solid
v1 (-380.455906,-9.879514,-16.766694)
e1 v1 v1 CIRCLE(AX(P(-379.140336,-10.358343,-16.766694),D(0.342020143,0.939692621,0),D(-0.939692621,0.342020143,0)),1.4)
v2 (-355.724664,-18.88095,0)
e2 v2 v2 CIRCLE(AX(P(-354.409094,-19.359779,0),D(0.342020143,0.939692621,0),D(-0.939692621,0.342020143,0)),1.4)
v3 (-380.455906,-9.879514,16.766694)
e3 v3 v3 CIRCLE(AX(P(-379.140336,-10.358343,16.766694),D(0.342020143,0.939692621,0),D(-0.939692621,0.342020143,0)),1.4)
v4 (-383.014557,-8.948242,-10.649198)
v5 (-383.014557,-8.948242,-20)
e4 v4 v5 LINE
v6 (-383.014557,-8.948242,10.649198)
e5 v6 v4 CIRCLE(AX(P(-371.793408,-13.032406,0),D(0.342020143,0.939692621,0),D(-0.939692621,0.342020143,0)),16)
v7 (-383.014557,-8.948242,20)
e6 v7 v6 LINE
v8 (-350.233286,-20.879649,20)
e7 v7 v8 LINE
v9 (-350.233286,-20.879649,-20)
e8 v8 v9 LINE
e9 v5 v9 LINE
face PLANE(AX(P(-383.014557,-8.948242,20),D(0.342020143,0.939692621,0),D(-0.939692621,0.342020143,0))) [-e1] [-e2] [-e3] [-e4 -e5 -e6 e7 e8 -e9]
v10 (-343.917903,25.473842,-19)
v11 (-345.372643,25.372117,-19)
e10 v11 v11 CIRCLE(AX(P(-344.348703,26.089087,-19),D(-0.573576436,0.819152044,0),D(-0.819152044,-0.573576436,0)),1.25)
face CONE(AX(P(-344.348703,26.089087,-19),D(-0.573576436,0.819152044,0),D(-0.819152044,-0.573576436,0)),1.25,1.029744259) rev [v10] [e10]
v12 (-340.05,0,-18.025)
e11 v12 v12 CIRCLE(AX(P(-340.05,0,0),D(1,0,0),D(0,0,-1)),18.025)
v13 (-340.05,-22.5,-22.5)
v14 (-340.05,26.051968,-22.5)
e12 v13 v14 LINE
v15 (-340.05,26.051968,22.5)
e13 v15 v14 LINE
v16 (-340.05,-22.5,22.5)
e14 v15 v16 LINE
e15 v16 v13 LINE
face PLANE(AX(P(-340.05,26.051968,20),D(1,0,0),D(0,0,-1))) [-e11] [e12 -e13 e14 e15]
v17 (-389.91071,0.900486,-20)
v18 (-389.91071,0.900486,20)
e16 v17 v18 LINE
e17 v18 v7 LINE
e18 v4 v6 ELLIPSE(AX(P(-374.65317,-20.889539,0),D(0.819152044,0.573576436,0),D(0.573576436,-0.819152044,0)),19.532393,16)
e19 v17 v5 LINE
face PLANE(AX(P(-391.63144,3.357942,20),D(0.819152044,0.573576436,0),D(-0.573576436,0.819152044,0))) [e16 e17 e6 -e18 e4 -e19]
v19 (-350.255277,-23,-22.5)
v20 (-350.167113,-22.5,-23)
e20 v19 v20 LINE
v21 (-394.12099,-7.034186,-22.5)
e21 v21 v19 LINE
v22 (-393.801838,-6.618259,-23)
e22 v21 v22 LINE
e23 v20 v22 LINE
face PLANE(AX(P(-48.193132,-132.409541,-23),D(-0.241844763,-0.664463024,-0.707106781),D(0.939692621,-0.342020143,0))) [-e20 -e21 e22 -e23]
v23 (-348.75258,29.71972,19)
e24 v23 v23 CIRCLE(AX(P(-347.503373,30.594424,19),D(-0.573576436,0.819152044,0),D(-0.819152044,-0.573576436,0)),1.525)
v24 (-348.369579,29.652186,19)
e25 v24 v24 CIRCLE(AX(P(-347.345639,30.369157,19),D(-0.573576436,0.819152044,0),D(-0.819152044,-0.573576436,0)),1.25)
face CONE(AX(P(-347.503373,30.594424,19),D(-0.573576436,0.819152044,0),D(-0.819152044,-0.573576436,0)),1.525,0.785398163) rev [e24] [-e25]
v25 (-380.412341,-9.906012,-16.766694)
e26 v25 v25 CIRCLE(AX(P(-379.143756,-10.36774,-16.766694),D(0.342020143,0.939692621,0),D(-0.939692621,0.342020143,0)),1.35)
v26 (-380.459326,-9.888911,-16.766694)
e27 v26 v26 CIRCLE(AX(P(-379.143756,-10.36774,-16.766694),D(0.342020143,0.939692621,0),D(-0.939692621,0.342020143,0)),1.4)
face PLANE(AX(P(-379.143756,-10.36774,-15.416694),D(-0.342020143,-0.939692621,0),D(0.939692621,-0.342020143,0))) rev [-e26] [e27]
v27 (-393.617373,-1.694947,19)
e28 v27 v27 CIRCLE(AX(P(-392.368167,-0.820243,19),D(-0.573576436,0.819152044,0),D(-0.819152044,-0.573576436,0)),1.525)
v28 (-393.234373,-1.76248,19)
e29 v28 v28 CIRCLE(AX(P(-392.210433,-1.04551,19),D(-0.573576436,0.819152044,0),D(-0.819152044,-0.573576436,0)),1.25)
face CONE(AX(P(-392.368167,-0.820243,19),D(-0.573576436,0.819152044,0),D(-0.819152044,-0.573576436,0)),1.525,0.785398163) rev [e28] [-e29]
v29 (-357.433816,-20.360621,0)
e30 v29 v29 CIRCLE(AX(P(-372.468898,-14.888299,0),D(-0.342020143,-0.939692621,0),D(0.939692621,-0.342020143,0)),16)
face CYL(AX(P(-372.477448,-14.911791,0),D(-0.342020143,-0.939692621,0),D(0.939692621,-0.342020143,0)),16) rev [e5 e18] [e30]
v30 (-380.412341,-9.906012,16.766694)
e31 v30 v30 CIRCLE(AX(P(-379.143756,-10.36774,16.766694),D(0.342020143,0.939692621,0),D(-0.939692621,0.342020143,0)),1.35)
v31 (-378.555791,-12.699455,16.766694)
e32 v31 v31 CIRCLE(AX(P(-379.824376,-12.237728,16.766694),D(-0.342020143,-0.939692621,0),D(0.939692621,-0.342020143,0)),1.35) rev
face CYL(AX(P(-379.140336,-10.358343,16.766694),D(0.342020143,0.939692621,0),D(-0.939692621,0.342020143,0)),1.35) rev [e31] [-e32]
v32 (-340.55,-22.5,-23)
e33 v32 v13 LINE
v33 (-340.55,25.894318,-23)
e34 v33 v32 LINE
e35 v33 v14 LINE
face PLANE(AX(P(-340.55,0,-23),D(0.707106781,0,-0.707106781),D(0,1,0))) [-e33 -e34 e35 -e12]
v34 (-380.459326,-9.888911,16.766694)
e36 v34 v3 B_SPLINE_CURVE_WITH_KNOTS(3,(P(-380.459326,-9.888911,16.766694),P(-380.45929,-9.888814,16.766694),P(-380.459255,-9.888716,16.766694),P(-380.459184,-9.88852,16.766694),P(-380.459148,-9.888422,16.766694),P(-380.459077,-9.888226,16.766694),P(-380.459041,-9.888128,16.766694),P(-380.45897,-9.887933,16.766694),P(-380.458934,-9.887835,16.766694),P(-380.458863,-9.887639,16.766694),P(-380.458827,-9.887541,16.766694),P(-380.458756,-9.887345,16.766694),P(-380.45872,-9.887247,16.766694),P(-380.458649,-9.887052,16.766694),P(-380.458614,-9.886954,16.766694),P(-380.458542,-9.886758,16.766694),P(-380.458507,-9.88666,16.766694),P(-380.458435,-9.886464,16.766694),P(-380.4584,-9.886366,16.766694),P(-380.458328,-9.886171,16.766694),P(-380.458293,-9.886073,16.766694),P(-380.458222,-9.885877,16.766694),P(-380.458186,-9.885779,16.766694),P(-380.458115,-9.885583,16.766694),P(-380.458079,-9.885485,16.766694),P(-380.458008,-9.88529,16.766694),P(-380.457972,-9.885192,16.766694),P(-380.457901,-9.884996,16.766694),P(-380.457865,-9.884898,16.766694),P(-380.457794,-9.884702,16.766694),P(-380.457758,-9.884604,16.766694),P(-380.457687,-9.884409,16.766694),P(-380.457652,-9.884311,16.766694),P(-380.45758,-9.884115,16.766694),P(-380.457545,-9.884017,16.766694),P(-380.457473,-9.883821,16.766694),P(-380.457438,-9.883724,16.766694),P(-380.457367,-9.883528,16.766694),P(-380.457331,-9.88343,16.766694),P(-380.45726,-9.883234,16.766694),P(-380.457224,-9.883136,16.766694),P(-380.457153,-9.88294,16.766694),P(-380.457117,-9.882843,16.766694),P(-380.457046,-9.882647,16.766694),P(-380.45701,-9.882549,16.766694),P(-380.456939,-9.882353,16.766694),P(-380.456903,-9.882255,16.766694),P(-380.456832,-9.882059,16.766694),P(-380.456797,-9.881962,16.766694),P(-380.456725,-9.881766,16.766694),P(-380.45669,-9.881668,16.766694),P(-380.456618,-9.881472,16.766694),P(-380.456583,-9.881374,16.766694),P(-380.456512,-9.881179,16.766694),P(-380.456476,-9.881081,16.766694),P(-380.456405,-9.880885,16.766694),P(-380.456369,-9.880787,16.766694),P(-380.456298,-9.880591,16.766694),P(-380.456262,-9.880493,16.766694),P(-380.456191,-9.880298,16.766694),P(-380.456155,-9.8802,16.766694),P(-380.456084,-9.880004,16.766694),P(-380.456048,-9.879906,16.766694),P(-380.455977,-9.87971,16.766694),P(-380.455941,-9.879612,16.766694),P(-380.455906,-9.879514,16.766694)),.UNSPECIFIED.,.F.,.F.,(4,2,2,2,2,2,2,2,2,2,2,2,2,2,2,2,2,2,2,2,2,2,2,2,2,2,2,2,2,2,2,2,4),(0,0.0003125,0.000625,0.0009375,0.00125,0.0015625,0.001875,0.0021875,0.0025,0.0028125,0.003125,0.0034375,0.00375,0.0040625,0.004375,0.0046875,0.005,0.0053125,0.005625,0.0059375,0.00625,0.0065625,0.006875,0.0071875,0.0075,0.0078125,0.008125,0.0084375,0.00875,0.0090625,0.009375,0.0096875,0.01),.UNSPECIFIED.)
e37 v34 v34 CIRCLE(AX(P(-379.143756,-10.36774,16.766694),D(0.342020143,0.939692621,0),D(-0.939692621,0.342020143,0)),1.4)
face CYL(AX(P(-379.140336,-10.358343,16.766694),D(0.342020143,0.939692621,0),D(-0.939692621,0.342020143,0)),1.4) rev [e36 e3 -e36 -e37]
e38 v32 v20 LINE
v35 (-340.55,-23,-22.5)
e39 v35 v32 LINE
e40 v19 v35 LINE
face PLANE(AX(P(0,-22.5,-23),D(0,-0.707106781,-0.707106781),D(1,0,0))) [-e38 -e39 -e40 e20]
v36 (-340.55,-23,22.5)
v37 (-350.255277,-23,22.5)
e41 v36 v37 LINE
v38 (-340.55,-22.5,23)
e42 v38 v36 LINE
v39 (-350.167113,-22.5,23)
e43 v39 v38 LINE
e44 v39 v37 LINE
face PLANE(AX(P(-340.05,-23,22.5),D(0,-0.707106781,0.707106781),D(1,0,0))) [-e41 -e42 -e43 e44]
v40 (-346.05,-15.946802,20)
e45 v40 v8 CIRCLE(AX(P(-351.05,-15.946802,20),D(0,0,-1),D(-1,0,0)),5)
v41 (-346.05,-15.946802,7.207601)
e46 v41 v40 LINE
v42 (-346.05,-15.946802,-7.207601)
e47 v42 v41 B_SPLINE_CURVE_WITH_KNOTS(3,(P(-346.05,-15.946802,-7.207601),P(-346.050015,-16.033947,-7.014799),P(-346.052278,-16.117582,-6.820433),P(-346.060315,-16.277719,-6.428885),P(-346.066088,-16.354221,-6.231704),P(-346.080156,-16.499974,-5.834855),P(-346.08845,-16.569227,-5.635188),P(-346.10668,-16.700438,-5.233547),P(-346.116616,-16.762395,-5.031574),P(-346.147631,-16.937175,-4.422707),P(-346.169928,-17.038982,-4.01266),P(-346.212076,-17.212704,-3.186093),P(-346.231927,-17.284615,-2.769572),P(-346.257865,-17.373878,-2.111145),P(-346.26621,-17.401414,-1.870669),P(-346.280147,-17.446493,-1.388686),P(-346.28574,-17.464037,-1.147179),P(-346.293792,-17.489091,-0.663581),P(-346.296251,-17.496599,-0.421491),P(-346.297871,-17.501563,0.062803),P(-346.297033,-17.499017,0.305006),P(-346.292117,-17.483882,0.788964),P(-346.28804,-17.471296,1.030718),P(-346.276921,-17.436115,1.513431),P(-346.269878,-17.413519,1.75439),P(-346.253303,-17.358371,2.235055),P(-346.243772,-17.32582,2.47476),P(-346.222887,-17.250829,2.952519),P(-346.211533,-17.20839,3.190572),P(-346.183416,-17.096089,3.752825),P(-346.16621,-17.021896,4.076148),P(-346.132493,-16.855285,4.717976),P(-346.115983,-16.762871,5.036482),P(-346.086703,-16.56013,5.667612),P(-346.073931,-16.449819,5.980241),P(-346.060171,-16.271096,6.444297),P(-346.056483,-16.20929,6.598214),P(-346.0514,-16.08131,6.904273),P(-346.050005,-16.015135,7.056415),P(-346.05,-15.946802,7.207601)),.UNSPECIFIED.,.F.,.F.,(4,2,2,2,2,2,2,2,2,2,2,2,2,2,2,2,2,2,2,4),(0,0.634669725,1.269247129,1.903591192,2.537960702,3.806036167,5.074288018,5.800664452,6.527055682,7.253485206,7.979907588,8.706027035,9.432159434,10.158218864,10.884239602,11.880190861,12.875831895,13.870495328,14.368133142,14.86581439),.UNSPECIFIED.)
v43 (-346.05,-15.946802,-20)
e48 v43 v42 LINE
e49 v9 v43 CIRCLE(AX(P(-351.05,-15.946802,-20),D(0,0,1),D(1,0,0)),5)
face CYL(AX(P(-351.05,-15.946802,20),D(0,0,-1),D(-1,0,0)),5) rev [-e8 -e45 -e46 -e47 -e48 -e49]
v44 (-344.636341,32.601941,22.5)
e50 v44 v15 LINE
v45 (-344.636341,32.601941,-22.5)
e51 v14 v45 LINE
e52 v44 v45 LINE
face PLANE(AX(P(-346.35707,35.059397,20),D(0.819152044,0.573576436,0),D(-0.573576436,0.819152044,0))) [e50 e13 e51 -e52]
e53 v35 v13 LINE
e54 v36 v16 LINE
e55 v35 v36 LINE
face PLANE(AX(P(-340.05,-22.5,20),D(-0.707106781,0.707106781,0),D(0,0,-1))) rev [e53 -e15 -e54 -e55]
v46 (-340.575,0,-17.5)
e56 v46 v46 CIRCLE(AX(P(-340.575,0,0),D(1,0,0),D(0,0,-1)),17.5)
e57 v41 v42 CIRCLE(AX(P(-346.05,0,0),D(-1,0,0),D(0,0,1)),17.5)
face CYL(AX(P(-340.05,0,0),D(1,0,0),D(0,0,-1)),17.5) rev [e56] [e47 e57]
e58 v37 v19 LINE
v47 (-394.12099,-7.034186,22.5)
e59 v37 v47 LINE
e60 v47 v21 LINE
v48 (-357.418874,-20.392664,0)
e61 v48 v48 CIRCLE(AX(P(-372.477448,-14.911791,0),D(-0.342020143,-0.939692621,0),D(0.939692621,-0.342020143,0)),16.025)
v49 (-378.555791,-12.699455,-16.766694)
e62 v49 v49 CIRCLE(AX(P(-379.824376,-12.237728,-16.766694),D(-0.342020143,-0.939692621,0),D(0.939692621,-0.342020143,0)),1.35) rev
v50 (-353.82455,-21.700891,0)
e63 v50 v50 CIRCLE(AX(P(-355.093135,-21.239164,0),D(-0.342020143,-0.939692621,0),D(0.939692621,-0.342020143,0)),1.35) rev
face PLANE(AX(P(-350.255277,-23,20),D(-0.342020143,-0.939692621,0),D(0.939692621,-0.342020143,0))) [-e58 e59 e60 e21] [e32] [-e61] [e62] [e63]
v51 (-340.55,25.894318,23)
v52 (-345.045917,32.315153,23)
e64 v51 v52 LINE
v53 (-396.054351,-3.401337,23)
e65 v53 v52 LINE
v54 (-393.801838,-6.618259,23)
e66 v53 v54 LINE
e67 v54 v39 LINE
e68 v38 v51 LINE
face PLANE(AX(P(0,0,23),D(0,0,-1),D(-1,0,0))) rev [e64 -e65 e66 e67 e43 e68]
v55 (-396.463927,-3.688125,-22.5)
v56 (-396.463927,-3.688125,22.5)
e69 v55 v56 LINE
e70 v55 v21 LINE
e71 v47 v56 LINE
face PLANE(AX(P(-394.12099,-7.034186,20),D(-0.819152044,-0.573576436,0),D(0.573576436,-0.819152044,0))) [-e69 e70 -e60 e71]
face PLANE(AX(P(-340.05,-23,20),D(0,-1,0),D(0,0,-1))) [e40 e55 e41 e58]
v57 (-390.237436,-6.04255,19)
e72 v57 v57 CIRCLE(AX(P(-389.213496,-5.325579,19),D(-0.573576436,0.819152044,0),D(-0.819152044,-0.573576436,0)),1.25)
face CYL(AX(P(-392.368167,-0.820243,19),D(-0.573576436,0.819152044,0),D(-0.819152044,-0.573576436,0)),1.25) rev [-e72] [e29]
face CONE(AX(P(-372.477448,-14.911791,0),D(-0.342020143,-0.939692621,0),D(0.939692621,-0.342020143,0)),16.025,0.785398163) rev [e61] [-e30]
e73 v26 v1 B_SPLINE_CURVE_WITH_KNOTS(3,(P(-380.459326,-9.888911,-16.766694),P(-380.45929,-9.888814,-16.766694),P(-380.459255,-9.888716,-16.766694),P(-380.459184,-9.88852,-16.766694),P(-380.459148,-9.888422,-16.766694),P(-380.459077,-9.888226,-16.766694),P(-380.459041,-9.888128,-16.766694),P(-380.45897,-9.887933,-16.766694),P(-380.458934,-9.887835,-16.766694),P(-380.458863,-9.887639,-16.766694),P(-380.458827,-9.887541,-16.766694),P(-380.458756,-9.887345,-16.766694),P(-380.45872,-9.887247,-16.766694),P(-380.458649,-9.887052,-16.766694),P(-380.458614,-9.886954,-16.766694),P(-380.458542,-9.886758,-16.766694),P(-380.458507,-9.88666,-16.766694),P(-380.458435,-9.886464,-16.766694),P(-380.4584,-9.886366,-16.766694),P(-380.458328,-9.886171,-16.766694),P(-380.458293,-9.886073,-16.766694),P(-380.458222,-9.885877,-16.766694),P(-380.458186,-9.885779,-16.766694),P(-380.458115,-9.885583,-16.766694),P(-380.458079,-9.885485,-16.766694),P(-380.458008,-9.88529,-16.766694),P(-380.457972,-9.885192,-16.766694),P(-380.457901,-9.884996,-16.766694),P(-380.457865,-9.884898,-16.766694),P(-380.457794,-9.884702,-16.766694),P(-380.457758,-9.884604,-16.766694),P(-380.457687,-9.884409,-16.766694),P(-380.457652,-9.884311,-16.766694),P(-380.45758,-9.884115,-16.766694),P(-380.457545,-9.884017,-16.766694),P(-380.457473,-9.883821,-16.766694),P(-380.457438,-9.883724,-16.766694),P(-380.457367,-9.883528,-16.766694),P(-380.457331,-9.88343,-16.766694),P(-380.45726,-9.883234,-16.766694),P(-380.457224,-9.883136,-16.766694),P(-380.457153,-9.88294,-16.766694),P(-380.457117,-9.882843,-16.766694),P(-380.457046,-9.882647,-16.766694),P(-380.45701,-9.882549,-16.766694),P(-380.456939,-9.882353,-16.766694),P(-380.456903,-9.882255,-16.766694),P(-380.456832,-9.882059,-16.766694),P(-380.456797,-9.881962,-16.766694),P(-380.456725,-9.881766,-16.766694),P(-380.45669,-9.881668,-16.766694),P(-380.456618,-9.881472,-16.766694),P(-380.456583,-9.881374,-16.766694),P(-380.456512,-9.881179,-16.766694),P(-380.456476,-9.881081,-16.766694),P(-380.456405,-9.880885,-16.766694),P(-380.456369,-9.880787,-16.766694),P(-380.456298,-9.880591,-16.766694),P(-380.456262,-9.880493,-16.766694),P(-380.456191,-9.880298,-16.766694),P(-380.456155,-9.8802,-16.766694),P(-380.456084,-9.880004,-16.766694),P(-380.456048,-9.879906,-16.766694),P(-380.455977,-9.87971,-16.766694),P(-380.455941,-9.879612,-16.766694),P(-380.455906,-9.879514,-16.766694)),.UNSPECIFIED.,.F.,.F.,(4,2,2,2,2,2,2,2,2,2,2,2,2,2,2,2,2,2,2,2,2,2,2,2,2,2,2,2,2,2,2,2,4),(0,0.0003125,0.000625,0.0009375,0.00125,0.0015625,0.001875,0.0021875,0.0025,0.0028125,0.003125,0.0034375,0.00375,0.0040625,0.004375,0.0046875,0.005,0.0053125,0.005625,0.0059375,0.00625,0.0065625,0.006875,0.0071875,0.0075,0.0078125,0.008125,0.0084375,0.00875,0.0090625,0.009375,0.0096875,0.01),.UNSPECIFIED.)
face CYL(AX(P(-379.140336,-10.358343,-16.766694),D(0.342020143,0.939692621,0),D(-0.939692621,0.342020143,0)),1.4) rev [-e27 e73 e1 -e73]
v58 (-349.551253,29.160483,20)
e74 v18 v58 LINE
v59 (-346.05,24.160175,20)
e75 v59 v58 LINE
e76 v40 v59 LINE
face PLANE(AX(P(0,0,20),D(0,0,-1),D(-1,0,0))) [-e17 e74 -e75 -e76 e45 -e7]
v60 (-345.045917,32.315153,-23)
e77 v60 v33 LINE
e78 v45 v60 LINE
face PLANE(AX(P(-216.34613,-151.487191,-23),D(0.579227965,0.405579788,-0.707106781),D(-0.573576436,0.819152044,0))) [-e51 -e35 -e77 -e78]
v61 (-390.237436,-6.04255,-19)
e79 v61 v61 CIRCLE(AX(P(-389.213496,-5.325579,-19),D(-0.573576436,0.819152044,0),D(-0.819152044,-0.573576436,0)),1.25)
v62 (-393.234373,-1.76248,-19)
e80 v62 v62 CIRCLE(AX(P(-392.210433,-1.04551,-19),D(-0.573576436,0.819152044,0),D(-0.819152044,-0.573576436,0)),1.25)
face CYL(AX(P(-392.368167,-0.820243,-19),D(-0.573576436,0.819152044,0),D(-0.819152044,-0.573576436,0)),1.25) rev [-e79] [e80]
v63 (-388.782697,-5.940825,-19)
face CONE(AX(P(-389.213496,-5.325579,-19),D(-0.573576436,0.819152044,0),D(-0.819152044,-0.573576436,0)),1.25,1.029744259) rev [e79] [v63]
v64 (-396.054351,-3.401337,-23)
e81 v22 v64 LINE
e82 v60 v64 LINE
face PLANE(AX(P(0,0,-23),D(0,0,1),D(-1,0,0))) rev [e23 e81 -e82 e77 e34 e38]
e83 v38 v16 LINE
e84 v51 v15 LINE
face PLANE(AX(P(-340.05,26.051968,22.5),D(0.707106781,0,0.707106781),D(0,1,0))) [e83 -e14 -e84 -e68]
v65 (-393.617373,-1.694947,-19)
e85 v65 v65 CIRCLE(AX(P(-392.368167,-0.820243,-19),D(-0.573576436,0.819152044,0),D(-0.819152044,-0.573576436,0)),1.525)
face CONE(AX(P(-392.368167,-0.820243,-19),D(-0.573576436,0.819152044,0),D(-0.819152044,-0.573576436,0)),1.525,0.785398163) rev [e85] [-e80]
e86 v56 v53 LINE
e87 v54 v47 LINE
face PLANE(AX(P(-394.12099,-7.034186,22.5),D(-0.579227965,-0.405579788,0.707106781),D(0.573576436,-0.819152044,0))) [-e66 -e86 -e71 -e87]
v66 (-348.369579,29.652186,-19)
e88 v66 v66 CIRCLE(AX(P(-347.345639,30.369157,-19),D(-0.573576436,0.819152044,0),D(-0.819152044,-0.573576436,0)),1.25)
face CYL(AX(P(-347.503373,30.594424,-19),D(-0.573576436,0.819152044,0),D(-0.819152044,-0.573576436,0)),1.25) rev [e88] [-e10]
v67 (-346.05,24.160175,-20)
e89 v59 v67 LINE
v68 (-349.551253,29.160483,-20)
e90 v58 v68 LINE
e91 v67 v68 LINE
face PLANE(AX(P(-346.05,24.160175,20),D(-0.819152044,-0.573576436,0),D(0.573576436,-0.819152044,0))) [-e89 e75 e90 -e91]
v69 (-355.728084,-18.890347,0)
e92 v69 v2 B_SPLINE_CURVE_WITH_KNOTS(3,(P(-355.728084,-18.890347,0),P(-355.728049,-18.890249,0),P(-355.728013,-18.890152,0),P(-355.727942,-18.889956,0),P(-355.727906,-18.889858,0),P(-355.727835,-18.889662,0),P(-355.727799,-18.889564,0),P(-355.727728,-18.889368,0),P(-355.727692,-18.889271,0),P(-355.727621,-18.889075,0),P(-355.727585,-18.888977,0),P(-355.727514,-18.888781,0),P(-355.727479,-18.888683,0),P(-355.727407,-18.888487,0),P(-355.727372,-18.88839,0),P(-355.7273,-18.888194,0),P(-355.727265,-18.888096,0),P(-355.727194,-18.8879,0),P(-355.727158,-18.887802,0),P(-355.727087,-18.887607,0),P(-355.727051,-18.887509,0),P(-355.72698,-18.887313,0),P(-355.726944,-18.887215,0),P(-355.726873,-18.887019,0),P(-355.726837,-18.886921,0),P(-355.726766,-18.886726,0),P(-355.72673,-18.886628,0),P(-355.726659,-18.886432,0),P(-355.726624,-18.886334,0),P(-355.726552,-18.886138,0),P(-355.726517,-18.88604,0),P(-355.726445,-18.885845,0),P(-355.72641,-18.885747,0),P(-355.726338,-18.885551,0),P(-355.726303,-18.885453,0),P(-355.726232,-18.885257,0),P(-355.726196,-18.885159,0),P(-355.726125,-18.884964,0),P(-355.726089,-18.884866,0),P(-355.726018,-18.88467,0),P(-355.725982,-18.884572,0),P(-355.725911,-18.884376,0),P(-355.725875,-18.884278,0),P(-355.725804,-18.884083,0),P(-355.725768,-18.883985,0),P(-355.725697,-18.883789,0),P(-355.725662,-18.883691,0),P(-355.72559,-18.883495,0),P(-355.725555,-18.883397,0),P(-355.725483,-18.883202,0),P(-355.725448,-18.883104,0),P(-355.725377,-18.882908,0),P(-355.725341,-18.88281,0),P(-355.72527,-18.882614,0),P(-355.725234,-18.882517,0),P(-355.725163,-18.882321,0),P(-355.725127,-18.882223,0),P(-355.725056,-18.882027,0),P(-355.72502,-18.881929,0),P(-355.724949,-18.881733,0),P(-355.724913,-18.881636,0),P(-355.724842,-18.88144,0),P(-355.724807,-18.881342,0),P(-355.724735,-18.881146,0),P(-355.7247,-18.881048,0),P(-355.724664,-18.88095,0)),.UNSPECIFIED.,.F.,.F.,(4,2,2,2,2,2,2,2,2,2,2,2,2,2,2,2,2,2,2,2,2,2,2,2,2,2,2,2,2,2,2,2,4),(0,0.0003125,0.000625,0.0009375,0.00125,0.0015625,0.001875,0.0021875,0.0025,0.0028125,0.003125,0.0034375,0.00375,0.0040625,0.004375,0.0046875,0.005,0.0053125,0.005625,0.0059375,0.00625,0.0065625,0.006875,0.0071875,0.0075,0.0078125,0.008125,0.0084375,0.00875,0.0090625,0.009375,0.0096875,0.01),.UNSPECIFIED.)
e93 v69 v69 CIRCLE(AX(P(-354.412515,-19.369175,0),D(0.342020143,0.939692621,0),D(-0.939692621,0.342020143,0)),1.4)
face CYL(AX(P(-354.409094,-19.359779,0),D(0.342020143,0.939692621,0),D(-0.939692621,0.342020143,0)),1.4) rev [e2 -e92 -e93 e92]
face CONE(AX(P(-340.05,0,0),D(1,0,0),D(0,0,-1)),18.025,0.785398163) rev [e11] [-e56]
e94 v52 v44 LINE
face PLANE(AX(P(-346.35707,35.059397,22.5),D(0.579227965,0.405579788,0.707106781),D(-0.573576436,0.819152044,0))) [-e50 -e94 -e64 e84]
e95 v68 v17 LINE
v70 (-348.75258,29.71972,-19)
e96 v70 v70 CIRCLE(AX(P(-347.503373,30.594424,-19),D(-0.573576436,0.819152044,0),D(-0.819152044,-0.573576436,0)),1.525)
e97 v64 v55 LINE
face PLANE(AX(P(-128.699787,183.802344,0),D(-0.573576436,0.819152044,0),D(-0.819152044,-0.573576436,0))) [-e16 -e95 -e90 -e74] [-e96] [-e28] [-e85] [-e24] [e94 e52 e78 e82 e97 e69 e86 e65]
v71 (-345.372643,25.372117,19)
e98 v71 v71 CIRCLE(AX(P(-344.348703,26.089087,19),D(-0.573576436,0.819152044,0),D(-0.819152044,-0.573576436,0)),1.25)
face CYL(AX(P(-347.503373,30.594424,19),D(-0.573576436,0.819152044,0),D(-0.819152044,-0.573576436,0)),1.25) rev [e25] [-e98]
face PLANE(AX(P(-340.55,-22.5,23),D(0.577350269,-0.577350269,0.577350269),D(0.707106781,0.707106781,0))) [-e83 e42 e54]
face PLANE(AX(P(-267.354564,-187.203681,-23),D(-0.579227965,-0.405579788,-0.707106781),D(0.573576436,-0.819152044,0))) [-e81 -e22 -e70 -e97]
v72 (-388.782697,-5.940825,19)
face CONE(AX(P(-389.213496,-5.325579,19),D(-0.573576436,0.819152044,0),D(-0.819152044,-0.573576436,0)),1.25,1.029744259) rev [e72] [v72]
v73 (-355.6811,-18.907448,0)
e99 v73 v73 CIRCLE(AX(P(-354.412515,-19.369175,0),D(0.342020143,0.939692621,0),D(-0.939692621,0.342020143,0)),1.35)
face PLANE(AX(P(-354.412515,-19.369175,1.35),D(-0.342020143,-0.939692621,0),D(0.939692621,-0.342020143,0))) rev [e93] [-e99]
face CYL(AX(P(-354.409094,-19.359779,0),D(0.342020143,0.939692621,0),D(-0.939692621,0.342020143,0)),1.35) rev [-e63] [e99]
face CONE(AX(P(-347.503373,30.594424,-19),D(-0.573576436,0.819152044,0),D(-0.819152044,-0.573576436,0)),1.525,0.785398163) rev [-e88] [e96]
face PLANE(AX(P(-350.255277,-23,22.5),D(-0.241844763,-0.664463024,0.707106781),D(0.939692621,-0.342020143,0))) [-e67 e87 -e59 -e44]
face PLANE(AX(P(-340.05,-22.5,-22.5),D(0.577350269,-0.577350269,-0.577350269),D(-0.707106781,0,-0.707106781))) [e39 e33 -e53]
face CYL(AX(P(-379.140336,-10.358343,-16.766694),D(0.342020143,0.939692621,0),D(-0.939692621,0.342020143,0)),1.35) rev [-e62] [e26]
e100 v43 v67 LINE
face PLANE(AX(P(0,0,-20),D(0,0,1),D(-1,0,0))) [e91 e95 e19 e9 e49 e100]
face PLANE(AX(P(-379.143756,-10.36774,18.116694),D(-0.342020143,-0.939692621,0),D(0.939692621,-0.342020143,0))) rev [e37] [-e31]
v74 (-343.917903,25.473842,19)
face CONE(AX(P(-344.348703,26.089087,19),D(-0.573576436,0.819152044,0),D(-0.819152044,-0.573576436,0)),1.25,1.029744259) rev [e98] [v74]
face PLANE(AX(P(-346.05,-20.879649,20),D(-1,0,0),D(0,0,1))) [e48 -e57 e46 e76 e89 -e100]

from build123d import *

# Parameters (mm, degrees)
P_IDAT_VYSUNUT_M1_DEPTH                     = 20
P_IDAT_VYSUNUT_M2_DEPTH                     = 3
V_LCOV_START                                = -141.407290306
V_LCOV_ZAHLOUBEN_PRO_M2_5_ROUBY_S_2_R       = 1.35
V_LCOV_ZAHLOUBEN_PRO_M2_5_ROUBY_S_VNI_DEPTH = 2
V_LCOV_START_2                              = -139.417290306
V_LCOV_ZAHLOUBEN_PRO_M2_5_ROUBY_S_3_O_R     = 1.4
V_LCOV_ZAHLOUBEN_PRO_M2_5_ROUBY_S_3_O_R_2   = 1.35
V_LCOV_ZAHLOUBEN_PRO_M2_5_ROUBY_S_3_DEPTH   = 0.01
SKICA13_W                                   = 63.2698
SKICA13_H                                   = 46
SKICA13_W_2                                 = 49.2698
SKICA13_H_2                                 = 40
ODEBRAT_VYSUNUT_M1_DEPTH                    = 3
M3_Z_VIT2_D                                 = 2.5
M3_Z_VIT2_DEPTH                             = 5.5
M3_Z_VIT2_CSINK_D                           = 3.05
M3_Z_VIT2_CSINK_ANGLE                       = 90
M3_Z_VIT2_TIP                               = 0.751075774
M3_Z_VIT2_ON_FACE_2_D                       = 2.5
M3_Z_VIT2_ON_FACE_2_DEPTH                   = 5.5
M3_Z_VIT2_ON_FACE_2_CSINK_D                 = 3.05
M3_Z_VIT2_ON_FACE_2_CSINK_ANGLE             = 90
M3_Z_VIT2_ON_FACE_2_TIP                     = 0.751075774
M3_Z_VIT2_ON_FACE_3_D                       = 2.5
M3_Z_VIT2_ON_FACE_3_DEPTH                   = 5.5
M3_Z_VIT2_ON_FACE_3_CSINK_D                 = 3.05
M3_Z_VIT2_ON_FACE_3_CSINK_ANGLE             = 90
M3_Z_VIT2_ON_FACE_3_TIP                     = 0.751075774
ZKOSEN_1_SIZE                               = 0.5
ZAOBLIT1_R                                  = 5


# Read off the part's stored shape, not the designer's step: Válcové zahloubení pro M2.5 šrouby s vnitřním šestihranem1
with BuildPart() as part:
    # Skica2 → Přidat vysunutím1 (new, symmetric)
    with BuildSketch(Plane.XY):
        Polygon((-340.05, -23), (-350.255276964, -23), (-394.120989631, -7.034186284), (-398.184656118, -1.23066909), (-391.631439764, 3.357942401), (-383.014556922, -8.948241654), (-350.233285651, -20.879648638), (-346.05, -20.879648638), (-346.05, 24.160174988), (-351.271982372, 31.617938704), (-346.357070106, 35.059397322), (-340.05, 26.051967722), align=None)
    extrude(amount=P_IDAT_VYSUNUT_M1_DEPTH, both=True)

    # Skica3 → Přidat vysunutím2 (add)
    with BuildSketch(Plane.XY.offset(20)):
        Polygon((-346.357070106, 35.059397322), (-340.05, 26.051967722), (-340.05, -23), (-350.255276964, -23), (-394.120989631, -7.034186284), (-398.184656118, -1.23066909), align=None)
    p_idat_vysunut_m2 = extrude(amount=P_IDAT_VYSUNUT_M2_DEPTH)

    # Zrcadlit1: Přidat vysunutím2 across plane
    add(p_idat_vysunut_m2.mirror(Plane.XY))

    # Skica6 → M36x1.0 závit1 (revolve, cut)
    with BuildSketch(Plane(origin=(-340.05, 0, 0), x_dir=(0, 0, -1), z_dir=(0, 1, 0))):
        Polygon((0, 0), (0, 6), (17.5, 6), (17.5, 0.525), (18.025, 0), align=None)
    revolve(axis=Axis((-333.7, 0, 0), (-1, 0, 0)), mode=Mode.SUBTRACT)

    # Skica8 → Ø32.0 (32) průměr díry1 (revolve, cut)
    with BuildSketch(Plane(origin=(-372.477448122, -14.911791158, 0), x_dir=(0.9396926207859314, -0.34202014332560576, 0), z_dir=(0, 0, 1))):
        Polygon((0, 0), (0, 15.613769904), (16, 6), (16, 0.025), (16.025, 0), align=None)
    revolve(axis=Axis((-374.649276032, -20.8788393, 0), (0.3420201433256057, 0.9396926207859314, 0)), mode=Mode.SUBTRACT)

    # V_lcov_ zahlouben_ pro M2.5 _rouby s 2 → Válcové zahloubení pro M2.5 šrouby s vnitřním šestihranem1 (cut)
    with BuildSketch(Plane(origin=(0, 0, 0), x_dir=(0.9396926207859079, -0.34202014332566993, 0), z_dir=(0.34202014332567, 0.939692620785908, 0)).offset(V_LCOV_START)):
        with Locations((-352.732614303, 16.76669406)):
            Circle(V_LCOV_ZAHLOUBEN_PRO_M2_5_ROUBY_S_2_R)
        with Locations((-352.732614303, -16.76669406)):
            Circle(V_LCOV_ZAHLOUBEN_PRO_M2_5_ROUBY_S_2_R)
        with Locations((-326.41417646, 0)):
            Circle(V_LCOV_ZAHLOUBEN_PRO_M2_5_ROUBY_S_2_R)
    extrude(amount=V_LCOV_ZAHLOUBEN_PRO_M2_5_ROUBY_S_VNI_DEPTH, mode=Mode.SUBTRACT)

    # V_lcov_ zahlouben_ pro M2.5 _rouby s 3 o → V_lcov_ zahlouben_ pro M2.5 _rouby s 3 (cut)
    # profile 1 of 3: a face of its own
    with BuildSketch(Plane(origin=(0, 0, 0), x_dir=(0.9396926207859079, -0.34202014332566993, 0), z_dir=(0.34202014332567, 0.939692620785908, 0)).offset(V_LCOV_START_2)):
        with Locations((-352.732614303, 16.76669406)):
            Circle(V_LCOV_ZAHLOUBEN_PRO_M2_5_ROUBY_S_3_O_R)
        with Locations((-352.732614303, 16.76669406)):
            Circle(V_LCOV_ZAHLOUBEN_PRO_M2_5_ROUBY_S_3_O_R_2, mode=Mode.SUBTRACT)
    # profile 2 of 3: a face of its own
    with BuildSketch(Plane(origin=(0, 0, 0), x_dir=(0.9396926207859079, -0.34202014332566993, 0), z_dir=(0.34202014332567, 0.939692620785908, 0)).offset(V_LCOV_START_2)):
        with Locations((-352.732614303, -16.76669406)):
            Circle(V_LCOV_ZAHLOUBEN_PRO_M2_5_ROUBY_S_3_O_R)
        with Locations((-352.732614303, -16.76669406)):
            Circle(V_LCOV_ZAHLOUBEN_PRO_M2_5_ROUBY_S_3_O_R_2, mode=Mode.SUBTRACT)
    # profile 3 of 3: a face of its own
    with BuildSketch(Plane(origin=(0, 0, 0), x_dir=(0.9396926207859079, -0.34202014332566993, 0), z_dir=(0.34202014332567, 0.939692620785908, 0)).offset(V_LCOV_START_2)):
        with Locations((-326.41417646, 0)):
            Circle(V_LCOV_ZAHLOUBEN_PRO_M2_5_ROUBY_S_3_O_R)
        with Locations((-326.41417646, 0)):
            Circle(V_LCOV_ZAHLOUBEN_PRO_M2_5_ROUBY_S_3_O_R_2, mode=Mode.SUBTRACT)
    extrude(amount=V_LCOV_ZAHLOUBEN_PRO_M2_5_ROUBY_S_3_DEPTH, mode=Mode.SUBTRACT)

    # Skica13 → Odebrat vysunutím1 (cut)
    with BuildSketch(Plane(origin=(-130.42051615, 186.259800178, 0), x_dir=(0.8191520442889952, 0.5735764363510412, 0), z_dir=(-0.5735764363510412, 0.8191520442889952, 0))):
        with Locations((-295.244757855, 0)):
            Rectangle(SKICA13_W, SKICA13_H)
        with Locations((-294.244757855, 0)):
            Rectangle(SKICA13_W_2, SKICA13_H_2, mode=Mode.SUBTRACT)
    extrude(amount=-ODEBRAT_VYSUNUT_M1_DEPTH, mode=Mode.SUBTRACT)

    # M3 závit2
    with Locations(Plane(origin=(-392.368166588, -0.820243041, 19), x_dir=(0.819152044289, 0.573576436351, 0), z_dir=(-0.573576436351, 0.819152044289, 0))):
        with Locations((0, 0)):
            CounterSinkHole(M3_Z_VIT2_D / 2, M3_Z_VIT2_CSINK_D / 2, depth=M3_Z_VIT2_DEPTH, counter_sink_angle=M3_Z_VIT2_CSINK_ANGLE)
            with Locations((0, 0, -(M3_Z_VIT2_DEPTH + M3_Z_VIT2_TIP / 2))):  # 118° drill point
                Cone(0, M3_Z_VIT2_D / 2, M3_Z_VIT2_TIP, mode=Mode.SUBTRACT)

    # M3 závit2 on face 2
    with Locations(Plane(origin=(-347.503372952, 30.594423662, -19), x_dir=(0.819152234736, 0.573576164364, 0), z_dir=(-0.573576164364, 0.819152234736, 0))):
        with Locations((0, 0), (0, -38)):
            CounterSinkHole(M3_Z_VIT2_ON_FACE_2_D / 2, M3_Z_VIT2_ON_FACE_2_CSINK_D / 2, depth=M3_Z_VIT2_ON_FACE_2_DEPTH, counter_sink_angle=M3_Z_VIT2_ON_FACE_2_CSINK_ANGLE)
            with Locations((0, 0, -(M3_Z_VIT2_ON_FACE_2_DEPTH + M3_Z_VIT2_ON_FACE_2_TIP / 2))):  # 118° drill point
                Cone(0, M3_Z_VIT2_ON_FACE_2_D / 2, M3_Z_VIT2_ON_FACE_2_TIP, mode=Mode.SUBTRACT)

    # M3 závit2 on face 3
    with Locations(Plane(origin=(-392.368166588, -0.820243041, -19), x_dir=(0.819152234736, 0.573576164364, 0), z_dir=(-0.573576164364, 0.819152234736, 0))):
        with Locations((0, 0)):
            CounterSinkHole(M3_Z_VIT2_ON_FACE_3_D / 2, M3_Z_VIT2_ON_FACE_3_CSINK_D / 2, depth=M3_Z_VIT2_ON_FACE_3_DEPTH, counter_sink_angle=M3_Z_VIT2_ON_FACE_3_CSINK_ANGLE)
            with Locations((0, 0, -(M3_Z_VIT2_ON_FACE_3_DEPTH + M3_Z_VIT2_ON_FACE_3_TIP / 2))):  # 118° drill point
                Cone(0, M3_Z_VIT2_ON_FACE_3_D / 2, M3_Z_VIT2_ON_FACE_3_TIP, mode=Mode.SUBTRACT)

    # Zkosení1
    zkosen_1_edges = [part.edges().sort_by_distance(p)[0] for p in [
        (-342.343170399, 29.326954456, -23),
        (-342.343170399, 29.326954456, 23),
        (-340.05, -23, 0),
        (-395.29245822, -5.361155754, 23),
        (-372.188133297, -15.017093142, 23),
        (-345.152638482, -23, 23),
        (-340.05, 1.525983861, 23),
        (-395.29245822, -5.361155754, -23),
        (-340.05, 1.525983861, -23),
        (-345.152638482, -23, -23),
        (-372.188133297, -15.017093142, -23),
    ]]
    chamfer(zkosen_1_edges, length=ZKOSEN_1_SIZE)

    # Zaoblit1
    # the kernel refuses this fillet: 5 mm, written as the material it adds along each edge
    with BuildSketch(Plane(origin=(-346.05, -20.879648638, 20), x_dir=(-1, 0, 0), z_dir=(0, 0, -1))) as zaoblit1_piece_1_section:
        with BuildLine():
            CenterArc((5, 4.932846812), ZAOBLIT1_R, 180, 80.599018085)
            Line((0, 4.932846812), (-0.1, 4.932846812))
            Line((-0.1, 4.932846812), (-0.1, 0))
            Line((-0.1, 0), (0, -0.1))
            ThreePointArc((0, -0.1), (2.091642826, -0.1), (4.166951364, -0.098656936))
            Line((4.166951364, -0.098656936), (4.183285651, 0))
        make_face()
    zaoblit1_piece_1 = extrude(amount=40, mode=Mode.PRIVATE)
    zaoblit1_piece_1 = zaoblit1_piece_1 - Plane(origin=(-347.091511424, 0, 0), x_dir=(0, 0, -1), z_dir=(1, 0, 0)) * Cylinder(17.5, 100, mode=Mode.PRIVATE)
    add(zaoblit1_piece_1)


solid = part.part
